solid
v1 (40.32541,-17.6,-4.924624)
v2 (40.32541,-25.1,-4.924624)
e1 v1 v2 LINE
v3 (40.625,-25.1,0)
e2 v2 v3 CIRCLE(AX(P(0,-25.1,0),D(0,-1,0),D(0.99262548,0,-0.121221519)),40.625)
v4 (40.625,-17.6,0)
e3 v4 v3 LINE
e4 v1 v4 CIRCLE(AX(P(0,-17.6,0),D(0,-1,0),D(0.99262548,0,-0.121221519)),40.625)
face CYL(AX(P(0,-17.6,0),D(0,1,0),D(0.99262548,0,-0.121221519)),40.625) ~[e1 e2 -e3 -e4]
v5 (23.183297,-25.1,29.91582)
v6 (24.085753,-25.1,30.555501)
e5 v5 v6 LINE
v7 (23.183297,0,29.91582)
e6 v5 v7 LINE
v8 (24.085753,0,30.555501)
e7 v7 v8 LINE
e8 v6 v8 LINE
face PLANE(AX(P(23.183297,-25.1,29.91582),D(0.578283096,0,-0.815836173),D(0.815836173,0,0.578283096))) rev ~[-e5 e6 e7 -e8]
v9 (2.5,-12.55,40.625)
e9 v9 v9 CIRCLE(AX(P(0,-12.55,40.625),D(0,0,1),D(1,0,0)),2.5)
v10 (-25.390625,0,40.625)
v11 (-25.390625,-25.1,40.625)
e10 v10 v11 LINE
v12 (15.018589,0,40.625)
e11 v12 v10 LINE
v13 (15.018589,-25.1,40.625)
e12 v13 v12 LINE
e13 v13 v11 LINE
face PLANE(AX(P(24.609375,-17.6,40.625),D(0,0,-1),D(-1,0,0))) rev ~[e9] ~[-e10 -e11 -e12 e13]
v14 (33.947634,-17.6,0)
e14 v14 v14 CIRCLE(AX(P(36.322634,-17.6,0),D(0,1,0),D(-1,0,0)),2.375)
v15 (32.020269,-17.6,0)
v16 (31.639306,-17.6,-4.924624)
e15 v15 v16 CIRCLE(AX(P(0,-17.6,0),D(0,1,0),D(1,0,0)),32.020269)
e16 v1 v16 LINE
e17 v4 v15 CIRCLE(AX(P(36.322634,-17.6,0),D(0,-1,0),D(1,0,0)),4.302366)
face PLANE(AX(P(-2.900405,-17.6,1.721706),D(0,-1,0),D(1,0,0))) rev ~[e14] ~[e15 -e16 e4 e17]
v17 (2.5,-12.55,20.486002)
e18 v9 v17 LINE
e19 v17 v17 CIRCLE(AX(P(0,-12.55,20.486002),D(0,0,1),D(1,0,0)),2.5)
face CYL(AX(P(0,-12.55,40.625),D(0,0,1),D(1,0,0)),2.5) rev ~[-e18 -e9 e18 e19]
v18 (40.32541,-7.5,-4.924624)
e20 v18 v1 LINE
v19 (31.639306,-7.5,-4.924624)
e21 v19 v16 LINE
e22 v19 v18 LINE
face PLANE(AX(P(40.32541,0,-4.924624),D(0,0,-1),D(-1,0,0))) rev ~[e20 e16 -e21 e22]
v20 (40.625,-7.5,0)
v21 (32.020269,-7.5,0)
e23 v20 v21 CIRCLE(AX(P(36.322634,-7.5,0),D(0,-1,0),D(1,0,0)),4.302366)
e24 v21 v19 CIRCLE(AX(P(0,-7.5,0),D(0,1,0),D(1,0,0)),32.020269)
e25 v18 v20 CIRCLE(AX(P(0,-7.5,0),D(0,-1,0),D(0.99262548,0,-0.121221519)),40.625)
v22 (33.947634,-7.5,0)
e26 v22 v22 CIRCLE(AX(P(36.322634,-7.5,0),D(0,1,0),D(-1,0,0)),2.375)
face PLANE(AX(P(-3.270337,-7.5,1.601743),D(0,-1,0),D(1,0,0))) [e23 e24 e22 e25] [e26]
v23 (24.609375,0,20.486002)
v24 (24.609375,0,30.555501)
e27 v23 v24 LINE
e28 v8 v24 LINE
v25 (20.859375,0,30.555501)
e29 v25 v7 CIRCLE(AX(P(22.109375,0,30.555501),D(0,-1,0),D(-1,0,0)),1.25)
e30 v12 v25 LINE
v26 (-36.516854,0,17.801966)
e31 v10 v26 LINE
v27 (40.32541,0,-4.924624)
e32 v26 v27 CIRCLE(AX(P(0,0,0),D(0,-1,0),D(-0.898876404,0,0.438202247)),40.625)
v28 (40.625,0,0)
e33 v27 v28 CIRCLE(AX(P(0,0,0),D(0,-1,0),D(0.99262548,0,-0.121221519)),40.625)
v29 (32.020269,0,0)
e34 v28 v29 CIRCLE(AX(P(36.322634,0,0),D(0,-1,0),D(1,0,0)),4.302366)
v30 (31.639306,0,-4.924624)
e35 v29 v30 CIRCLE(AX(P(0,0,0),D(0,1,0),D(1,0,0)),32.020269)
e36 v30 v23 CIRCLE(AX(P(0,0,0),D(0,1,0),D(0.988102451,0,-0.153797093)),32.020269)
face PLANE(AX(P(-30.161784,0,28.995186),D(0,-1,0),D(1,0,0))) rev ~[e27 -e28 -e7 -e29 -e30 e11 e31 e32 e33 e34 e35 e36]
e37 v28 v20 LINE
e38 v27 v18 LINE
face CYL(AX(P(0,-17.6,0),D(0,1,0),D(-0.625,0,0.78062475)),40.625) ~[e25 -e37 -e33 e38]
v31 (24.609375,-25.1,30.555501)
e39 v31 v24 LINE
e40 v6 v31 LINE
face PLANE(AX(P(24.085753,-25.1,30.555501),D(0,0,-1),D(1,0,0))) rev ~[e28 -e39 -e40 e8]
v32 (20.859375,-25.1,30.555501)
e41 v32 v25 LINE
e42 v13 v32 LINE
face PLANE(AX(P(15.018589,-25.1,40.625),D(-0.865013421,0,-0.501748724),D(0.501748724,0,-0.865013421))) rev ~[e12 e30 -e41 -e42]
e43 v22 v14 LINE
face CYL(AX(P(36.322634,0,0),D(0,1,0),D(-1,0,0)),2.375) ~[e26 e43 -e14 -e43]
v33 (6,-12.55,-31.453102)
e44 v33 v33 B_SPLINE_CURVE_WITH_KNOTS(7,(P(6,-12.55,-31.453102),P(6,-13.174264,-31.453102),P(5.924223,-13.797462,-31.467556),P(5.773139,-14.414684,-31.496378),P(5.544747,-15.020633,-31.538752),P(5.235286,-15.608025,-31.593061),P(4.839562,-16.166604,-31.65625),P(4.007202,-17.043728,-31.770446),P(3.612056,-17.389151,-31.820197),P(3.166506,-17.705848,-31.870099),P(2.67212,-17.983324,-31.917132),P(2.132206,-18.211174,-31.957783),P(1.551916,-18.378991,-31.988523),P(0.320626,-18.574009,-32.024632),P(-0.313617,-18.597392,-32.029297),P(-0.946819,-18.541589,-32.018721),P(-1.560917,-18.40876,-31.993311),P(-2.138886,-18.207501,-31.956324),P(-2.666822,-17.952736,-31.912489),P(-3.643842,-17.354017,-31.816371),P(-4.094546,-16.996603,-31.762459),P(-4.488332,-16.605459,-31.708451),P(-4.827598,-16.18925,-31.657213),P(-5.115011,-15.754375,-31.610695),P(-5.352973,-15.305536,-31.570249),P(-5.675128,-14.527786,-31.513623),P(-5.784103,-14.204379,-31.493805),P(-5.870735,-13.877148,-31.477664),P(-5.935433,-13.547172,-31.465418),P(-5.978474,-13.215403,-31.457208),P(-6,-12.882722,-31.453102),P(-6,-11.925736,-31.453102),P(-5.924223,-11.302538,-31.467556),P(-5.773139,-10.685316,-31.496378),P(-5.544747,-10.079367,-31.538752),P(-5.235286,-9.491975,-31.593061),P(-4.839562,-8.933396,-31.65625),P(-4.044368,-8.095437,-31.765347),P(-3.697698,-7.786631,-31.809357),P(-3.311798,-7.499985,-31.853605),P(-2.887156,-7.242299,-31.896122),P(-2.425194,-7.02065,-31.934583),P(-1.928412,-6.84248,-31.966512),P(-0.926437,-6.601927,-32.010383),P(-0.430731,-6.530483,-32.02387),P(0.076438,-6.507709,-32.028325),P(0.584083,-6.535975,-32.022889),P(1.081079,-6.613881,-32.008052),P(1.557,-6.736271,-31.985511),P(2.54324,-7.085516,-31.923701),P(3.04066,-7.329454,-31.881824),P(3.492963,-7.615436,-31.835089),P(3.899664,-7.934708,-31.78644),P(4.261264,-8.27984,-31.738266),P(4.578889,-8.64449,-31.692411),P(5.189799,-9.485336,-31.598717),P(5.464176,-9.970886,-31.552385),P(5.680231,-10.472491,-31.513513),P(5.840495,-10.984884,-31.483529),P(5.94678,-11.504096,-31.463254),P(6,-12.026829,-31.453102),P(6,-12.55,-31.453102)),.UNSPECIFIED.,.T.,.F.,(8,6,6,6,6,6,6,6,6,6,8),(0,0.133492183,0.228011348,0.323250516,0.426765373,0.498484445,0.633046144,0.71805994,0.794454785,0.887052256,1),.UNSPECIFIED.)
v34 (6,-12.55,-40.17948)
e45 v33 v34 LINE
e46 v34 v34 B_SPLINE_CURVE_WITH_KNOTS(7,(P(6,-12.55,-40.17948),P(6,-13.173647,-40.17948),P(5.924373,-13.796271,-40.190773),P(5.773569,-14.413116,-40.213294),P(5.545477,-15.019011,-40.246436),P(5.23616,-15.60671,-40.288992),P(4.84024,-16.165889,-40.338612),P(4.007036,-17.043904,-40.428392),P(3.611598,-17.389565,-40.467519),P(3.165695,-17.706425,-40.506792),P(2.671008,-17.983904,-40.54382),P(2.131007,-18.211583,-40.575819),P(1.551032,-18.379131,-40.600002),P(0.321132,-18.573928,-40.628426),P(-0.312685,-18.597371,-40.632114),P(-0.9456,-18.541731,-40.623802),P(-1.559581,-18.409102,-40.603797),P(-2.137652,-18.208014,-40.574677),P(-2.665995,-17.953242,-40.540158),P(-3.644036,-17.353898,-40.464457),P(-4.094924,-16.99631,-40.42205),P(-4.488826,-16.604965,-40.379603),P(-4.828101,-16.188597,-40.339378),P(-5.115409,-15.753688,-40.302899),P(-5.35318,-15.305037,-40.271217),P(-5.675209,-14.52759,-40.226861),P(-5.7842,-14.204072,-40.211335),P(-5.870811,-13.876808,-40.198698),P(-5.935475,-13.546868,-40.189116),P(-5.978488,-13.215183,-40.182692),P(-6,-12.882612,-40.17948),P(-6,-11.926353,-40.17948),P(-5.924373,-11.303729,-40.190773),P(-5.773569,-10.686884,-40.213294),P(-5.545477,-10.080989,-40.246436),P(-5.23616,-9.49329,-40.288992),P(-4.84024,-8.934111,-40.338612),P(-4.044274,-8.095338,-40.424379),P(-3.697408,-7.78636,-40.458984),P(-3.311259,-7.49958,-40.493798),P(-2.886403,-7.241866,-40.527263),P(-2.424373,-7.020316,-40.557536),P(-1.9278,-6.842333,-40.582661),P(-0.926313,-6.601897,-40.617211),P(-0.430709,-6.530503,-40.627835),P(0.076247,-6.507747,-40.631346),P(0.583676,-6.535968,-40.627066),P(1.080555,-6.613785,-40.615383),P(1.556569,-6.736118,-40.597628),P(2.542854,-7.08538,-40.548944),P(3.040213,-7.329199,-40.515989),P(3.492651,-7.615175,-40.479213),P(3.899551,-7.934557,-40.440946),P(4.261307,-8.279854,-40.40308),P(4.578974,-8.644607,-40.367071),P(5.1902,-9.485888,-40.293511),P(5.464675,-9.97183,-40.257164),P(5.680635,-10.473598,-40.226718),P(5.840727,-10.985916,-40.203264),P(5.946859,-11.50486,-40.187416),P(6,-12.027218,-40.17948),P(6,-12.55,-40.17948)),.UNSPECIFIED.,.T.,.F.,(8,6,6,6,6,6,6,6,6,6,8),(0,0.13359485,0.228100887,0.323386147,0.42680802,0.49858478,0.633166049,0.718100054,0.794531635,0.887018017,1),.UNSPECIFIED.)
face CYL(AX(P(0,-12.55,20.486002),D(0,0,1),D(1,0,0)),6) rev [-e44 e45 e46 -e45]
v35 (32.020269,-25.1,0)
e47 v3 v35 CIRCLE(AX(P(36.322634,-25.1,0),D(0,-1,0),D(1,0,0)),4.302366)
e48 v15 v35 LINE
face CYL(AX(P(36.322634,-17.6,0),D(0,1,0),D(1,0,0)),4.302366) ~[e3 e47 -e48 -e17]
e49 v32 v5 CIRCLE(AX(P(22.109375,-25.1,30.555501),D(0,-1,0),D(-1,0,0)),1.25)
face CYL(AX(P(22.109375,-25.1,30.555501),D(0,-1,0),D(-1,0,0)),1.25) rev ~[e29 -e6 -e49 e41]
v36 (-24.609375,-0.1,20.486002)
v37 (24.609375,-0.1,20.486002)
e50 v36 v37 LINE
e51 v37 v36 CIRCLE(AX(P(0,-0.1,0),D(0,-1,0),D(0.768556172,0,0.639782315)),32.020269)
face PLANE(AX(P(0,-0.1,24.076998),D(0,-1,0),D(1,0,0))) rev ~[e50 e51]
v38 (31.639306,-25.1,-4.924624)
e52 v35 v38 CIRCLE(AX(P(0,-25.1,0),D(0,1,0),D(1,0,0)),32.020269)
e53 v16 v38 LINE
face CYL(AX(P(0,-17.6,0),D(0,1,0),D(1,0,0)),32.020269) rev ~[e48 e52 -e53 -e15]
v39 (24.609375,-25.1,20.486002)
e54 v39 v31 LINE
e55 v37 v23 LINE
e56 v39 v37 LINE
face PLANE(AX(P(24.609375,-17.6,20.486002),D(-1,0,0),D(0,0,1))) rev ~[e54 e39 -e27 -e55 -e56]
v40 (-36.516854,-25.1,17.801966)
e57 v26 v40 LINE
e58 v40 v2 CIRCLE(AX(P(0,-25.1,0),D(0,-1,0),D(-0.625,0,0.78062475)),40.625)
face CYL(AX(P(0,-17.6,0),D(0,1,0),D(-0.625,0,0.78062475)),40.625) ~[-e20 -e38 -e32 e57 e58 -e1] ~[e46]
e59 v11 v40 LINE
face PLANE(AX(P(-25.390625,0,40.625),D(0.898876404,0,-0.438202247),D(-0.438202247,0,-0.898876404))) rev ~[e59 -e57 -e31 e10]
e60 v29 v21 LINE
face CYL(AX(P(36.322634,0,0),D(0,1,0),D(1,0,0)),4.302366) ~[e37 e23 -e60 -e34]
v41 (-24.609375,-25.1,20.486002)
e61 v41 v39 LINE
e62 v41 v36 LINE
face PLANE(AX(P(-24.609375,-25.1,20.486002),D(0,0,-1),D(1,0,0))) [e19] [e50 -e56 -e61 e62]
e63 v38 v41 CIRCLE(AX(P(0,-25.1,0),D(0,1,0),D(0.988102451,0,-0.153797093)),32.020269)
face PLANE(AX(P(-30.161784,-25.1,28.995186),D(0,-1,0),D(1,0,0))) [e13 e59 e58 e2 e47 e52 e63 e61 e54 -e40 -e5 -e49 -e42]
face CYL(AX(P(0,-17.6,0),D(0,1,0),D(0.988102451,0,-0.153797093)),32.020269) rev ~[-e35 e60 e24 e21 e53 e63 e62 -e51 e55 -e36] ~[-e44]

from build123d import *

# Parameters (mm, degrees)
F1_DEPTH  = 7.5
F2_DEPTH  = 17.6
F4_DEPTH  = 7.5
F6_DEPTH  = 25
F7_DEPTH  = 25.1
F8_R      = 2.5
F9_DEPTH  = 121.4
F10_DEPTH = 25.1
F11_R     = 6
F11_R_2   = 2.5
F12_DEPTH = 82
F14_DEPTH = 25.1


# Not quite as in the source:
# - a feature names something its author has since deleted; it is built from what else it names


with BuildPart() as f1:
    # F0 (on Front) → F1 (new body)
    with BuildSketch(Plane.XZ):
        with BuildLine():
            Line((24.609375, 40.625), (-25.390625, 40.625))
            Line((-25.390625, 40.625), (-25.390625, 31.7128804606))
            ThreePointArc((-25.390625, 31.7128804606), (-31.7255791152, 25.3747562511), (-36.5168539326, 17.8019662921))
            ThreePointArc((-36.5168539326, 17.8019662921), (-11.5217513517, -38.9568976022), (40.3254101185, -4.924624227))
            Line((40.3254101185, -4.924624227), (31.6393058234, -4.924624227))
            ThreePointArc((31.6393058234, -4.924624227), (-30.8610352871, -8.5378040369), (24.609375, 20.4860015345))
            Line((24.609375, 20.4860015345), (24.609375, 32.3228910698))
            Line((24.609375, 32.3228910698), (24.609375, 40.625))
        make_face()
        with BuildLine():
            Line((31.6393058234, -4.924624227), (40.3254101185, -4.924624227))
            ThreePointArc((40.3254101185, -4.924624227), (40.5500333604, -2.4668642988), (40.625, 0))
            ThreePointArc((40.625, 0), (36.3226342652, -4.3023657348), (32.0202685305, 0))
            ThreePointArc((32.0202685305, 0), (31.9248857895, -2.469668822), (31.6393058234, -4.924624227))
        make_face()
        with BuildLine():
            Line((38.6976342652, 0), (40.625, 0))
            ThreePointArc((40.625, 0), (36.3226342652, 4.3023657348), (32.0202685305, 0))
            Line((32.0202685305, 0), (33.9476342652, 0))
            ThreePointArc((33.9476342652, 0), (36.3226342652, 2.375), (38.6976342652, 0))
        make_face()
        with BuildLine():
            ThreePointArc((32.0202685305, 0), (36.3226342652, -4.3023657348), (40.625, 0))
            Line((40.625, 0), (38.6976342652, 0))
            ThreePointArc((38.6976342652, 0), (36.3226342652, -2.375), (33.9476342652, 0))
            Line((33.9476342652, 0), (32.0202685305, 0))
        make_face()
    extrude(amount=F1_DEPTH)

    # F0 (on Front) → F2 (join)
    with BuildSketch(Plane.XZ):
        with BuildLine():
            Line((24.609375, 40.625), (-25.390625, 40.625))
            Line((-25.390625, 40.625), (-25.390625, 31.7128804606))
            ThreePointArc((-25.390625, 31.7128804606), (-31.7255791152, 25.3747562511), (-36.5168539326, 17.8019662921))
            ThreePointArc((-36.5168539326, 17.8019662921), (-11.5217513517, -38.9568976022), (40.3254101185, -4.924624227))
            Line((40.3254101185, -4.924624227), (31.6393058234, -4.924624227))
            ThreePointArc((31.6393058234, -4.924624227), (-30.8610352871, -8.5378040369), (24.609375, 20.4860015345))
            Line((24.609375, 20.4860015345), (24.609375, 32.3228910698))
            Line((24.609375, 32.3228910698), (24.609375, 40.625))
        make_face()
    extrude(amount=F2_DEPTH)

    # F3 (on face) → F4 (join)
    with BuildSketch(Plane.XZ.offset(17.6)):
        with BuildLine():
            Line((24.609375, 40.625), (-25.390625, 40.625))
            Line((-25.390625, 40.625), (-25.390625, 31.7128804606))
            ThreePointArc((-25.390625, 31.7128804606), (-19.7822809369, -35.4831225505), (40.3254101185, -4.924624227))
            Line((40.3254101185, -4.924624227), (31.6393058234, -4.924624227))
            ThreePointArc((31.6393058234, -4.924624227), (-30.8610352871, -8.5378040369), (24.609375, 20.4860015345))
            Line((24.609375, 20.4860015345), (24.609375, 32.3228910698))
            Line((24.609375, 32.3228910698), (24.609375, 40.625))
        make_face()
        with BuildLine():
            Line((31.6393058234, -4.924624227), (40.3254101185, -4.924624227))
            ThreePointArc((40.3254101185, -4.924624227), (40.5500333604, -2.4668642988), (40.625, 0))
            ThreePointArc((40.625, 0), (36.3226342652, -4.3023657348), (32.0202685305, 0))
            ThreePointArc((32.0202685305, 0), (31.9248857895, -2.469668822), (31.6393058234, -4.924624227))
        make_face()
        with BuildLine():
            ThreePointArc((32.0202685305, 0), (36.3226342652, -4.3023657348), (40.625, 0))
            Line((40.625, 0), (38.6976342652, 0))
            ThreePointArc((38.6976342652, 0), (36.3226342652, -2.375), (33.9476342652, 0))
            Line((33.9476342652, 0), (32.0202685305, 0))
        make_face()
        with BuildLine():
            Line((38.6976342652, 0), (40.625, 0))
            ThreePointArc((40.625, 0), (36.3226342652, 4.3023657348), (32.0202685305, 0))
            Line((32.0202685305, 0), (33.9476342652, 0))
            ThreePointArc((33.9476342652, 0), (36.3226342652, 2.375), (38.6976342652, 0))
        make_face()
    extrude(amount=F4_DEPTH)

    # F5 (on face) → F6 (join)
    with BuildSketch(Plane.XZ.offset(25.1)):
        with BuildLine():
            Line((-24.609375, 20.4860015345), (24.609375, 20.4860015345))
            ThreePointArc((24.609375, 20.4860015345), (0, 32.0202685305), (-24.609375, 20.4860015345))
        make_face()
    extrude(amount=-F6_DEPTH)

    # F0 (on Front) → F7 (join)
    with BuildSketch(Plane.XZ):
        with BuildLine():
            Line((33.9476342652, 0), (38.6976342652, 0))
            ThreePointArc((38.6976342652, 0), (36.3226342652, 2.375), (33.9476342652, 0))
        make_face()
        with BuildLine():
            ThreePointArc((33.9476342652, 0), (36.3226342652, -2.375), (38.6976342652, 0))
            Line((38.6976342652, 0), (33.9476342652, 0))
        make_face()
    extrude(amount=F7_DEPTH)

    # F8 (on face) → F9 (cut)
    with BuildSketch(Plane.XY.offset(40.625)):
        with Locations((0, -12.55)):
            Circle(F8_R)
    extrude(amount=-F9_DEPTH, mode=Mode.SUBTRACT)

    # F0 (on Front) → F10 (join)
    with BuildSketch(Plane.XZ):
        with BuildLine():
            Line((-25.390625, 31.7128804606), (-25.390625, 40.625))
            Line((-25.390625, 40.625), (-36.5168539326, 17.8019662921))
            ThreePointArc((-36.5168539326, 17.8019662921), (-31.7255791152, 25.3747562511), (-25.390625, 31.7128804606))
        make_face()
    extrude(amount=F10_DEPTH)

    # F11 (on face) → F12 (cut)
    with BuildSketch(Plane(origin=(0, 0, 20.4860015345), x_dir=(1, 0, 0), z_dir=(0, 0, -1))):
        with Locations((0, 12.55)):
            Circle(F11_R)
        with Locations((0, 12.55)):
            Circle(F11_R_2, mode=Mode.SUBTRACT)
    extrude(amount=F12_DEPTH, mode=Mode.SUBTRACT)

    # F13 (on face) → F14 (cut)
    with BuildSketch(Plane.XZ.offset(25.1)):
        with BuildLine():
            ThreePointArc((23.1832968576, 29.9158197188), (23.3145518173, 30.2237646688), (23.359375, 30.5555007673))
            ThreePointArc((23.359375, 30.5555007673), (22.109375, 31.8055007673), (20.859375, 30.5555007673))
            ThreePointArc((20.859375, 30.5555007673), (21.7776389015, 29.35032395), (23.1832968576, 29.9158197188))
        make_face()
        with BuildLine():
            Line((24.085752666, 30.5555007673), (23.359375, 30.5555007673))
            ThreePointArc((23.359375, 30.5555007673), (23.3145518173, 30.2237646688), (23.1832968576, 29.9158197188))
            Line((23.1832968576, 29.9158197188), (24.085752666, 30.5555007673))
        make_face()
        with BuildLine():
            ThreePointArc((20.859375, 30.5555007673), (22.109375, 31.8055007673), (23.359375, 30.5555007673))
            Line((23.359375, 30.5555007673), (24.085752666, 30.5555007673))
            Line((24.085752666, 30.5555007673), (24.609375, 30.5555007673))
            Line((24.609375, 30.5555007673), (24.609375, 40.625))
            Line((24.609375, 40.625), (15.0185888633, 40.625))
            Line((15.0185888633, 40.625), (20.859375, 30.5555007673))
        make_face()
    extrude(amount=-F14_DEPTH, mode=Mode.SUBTRACT)


solid = f1.part
